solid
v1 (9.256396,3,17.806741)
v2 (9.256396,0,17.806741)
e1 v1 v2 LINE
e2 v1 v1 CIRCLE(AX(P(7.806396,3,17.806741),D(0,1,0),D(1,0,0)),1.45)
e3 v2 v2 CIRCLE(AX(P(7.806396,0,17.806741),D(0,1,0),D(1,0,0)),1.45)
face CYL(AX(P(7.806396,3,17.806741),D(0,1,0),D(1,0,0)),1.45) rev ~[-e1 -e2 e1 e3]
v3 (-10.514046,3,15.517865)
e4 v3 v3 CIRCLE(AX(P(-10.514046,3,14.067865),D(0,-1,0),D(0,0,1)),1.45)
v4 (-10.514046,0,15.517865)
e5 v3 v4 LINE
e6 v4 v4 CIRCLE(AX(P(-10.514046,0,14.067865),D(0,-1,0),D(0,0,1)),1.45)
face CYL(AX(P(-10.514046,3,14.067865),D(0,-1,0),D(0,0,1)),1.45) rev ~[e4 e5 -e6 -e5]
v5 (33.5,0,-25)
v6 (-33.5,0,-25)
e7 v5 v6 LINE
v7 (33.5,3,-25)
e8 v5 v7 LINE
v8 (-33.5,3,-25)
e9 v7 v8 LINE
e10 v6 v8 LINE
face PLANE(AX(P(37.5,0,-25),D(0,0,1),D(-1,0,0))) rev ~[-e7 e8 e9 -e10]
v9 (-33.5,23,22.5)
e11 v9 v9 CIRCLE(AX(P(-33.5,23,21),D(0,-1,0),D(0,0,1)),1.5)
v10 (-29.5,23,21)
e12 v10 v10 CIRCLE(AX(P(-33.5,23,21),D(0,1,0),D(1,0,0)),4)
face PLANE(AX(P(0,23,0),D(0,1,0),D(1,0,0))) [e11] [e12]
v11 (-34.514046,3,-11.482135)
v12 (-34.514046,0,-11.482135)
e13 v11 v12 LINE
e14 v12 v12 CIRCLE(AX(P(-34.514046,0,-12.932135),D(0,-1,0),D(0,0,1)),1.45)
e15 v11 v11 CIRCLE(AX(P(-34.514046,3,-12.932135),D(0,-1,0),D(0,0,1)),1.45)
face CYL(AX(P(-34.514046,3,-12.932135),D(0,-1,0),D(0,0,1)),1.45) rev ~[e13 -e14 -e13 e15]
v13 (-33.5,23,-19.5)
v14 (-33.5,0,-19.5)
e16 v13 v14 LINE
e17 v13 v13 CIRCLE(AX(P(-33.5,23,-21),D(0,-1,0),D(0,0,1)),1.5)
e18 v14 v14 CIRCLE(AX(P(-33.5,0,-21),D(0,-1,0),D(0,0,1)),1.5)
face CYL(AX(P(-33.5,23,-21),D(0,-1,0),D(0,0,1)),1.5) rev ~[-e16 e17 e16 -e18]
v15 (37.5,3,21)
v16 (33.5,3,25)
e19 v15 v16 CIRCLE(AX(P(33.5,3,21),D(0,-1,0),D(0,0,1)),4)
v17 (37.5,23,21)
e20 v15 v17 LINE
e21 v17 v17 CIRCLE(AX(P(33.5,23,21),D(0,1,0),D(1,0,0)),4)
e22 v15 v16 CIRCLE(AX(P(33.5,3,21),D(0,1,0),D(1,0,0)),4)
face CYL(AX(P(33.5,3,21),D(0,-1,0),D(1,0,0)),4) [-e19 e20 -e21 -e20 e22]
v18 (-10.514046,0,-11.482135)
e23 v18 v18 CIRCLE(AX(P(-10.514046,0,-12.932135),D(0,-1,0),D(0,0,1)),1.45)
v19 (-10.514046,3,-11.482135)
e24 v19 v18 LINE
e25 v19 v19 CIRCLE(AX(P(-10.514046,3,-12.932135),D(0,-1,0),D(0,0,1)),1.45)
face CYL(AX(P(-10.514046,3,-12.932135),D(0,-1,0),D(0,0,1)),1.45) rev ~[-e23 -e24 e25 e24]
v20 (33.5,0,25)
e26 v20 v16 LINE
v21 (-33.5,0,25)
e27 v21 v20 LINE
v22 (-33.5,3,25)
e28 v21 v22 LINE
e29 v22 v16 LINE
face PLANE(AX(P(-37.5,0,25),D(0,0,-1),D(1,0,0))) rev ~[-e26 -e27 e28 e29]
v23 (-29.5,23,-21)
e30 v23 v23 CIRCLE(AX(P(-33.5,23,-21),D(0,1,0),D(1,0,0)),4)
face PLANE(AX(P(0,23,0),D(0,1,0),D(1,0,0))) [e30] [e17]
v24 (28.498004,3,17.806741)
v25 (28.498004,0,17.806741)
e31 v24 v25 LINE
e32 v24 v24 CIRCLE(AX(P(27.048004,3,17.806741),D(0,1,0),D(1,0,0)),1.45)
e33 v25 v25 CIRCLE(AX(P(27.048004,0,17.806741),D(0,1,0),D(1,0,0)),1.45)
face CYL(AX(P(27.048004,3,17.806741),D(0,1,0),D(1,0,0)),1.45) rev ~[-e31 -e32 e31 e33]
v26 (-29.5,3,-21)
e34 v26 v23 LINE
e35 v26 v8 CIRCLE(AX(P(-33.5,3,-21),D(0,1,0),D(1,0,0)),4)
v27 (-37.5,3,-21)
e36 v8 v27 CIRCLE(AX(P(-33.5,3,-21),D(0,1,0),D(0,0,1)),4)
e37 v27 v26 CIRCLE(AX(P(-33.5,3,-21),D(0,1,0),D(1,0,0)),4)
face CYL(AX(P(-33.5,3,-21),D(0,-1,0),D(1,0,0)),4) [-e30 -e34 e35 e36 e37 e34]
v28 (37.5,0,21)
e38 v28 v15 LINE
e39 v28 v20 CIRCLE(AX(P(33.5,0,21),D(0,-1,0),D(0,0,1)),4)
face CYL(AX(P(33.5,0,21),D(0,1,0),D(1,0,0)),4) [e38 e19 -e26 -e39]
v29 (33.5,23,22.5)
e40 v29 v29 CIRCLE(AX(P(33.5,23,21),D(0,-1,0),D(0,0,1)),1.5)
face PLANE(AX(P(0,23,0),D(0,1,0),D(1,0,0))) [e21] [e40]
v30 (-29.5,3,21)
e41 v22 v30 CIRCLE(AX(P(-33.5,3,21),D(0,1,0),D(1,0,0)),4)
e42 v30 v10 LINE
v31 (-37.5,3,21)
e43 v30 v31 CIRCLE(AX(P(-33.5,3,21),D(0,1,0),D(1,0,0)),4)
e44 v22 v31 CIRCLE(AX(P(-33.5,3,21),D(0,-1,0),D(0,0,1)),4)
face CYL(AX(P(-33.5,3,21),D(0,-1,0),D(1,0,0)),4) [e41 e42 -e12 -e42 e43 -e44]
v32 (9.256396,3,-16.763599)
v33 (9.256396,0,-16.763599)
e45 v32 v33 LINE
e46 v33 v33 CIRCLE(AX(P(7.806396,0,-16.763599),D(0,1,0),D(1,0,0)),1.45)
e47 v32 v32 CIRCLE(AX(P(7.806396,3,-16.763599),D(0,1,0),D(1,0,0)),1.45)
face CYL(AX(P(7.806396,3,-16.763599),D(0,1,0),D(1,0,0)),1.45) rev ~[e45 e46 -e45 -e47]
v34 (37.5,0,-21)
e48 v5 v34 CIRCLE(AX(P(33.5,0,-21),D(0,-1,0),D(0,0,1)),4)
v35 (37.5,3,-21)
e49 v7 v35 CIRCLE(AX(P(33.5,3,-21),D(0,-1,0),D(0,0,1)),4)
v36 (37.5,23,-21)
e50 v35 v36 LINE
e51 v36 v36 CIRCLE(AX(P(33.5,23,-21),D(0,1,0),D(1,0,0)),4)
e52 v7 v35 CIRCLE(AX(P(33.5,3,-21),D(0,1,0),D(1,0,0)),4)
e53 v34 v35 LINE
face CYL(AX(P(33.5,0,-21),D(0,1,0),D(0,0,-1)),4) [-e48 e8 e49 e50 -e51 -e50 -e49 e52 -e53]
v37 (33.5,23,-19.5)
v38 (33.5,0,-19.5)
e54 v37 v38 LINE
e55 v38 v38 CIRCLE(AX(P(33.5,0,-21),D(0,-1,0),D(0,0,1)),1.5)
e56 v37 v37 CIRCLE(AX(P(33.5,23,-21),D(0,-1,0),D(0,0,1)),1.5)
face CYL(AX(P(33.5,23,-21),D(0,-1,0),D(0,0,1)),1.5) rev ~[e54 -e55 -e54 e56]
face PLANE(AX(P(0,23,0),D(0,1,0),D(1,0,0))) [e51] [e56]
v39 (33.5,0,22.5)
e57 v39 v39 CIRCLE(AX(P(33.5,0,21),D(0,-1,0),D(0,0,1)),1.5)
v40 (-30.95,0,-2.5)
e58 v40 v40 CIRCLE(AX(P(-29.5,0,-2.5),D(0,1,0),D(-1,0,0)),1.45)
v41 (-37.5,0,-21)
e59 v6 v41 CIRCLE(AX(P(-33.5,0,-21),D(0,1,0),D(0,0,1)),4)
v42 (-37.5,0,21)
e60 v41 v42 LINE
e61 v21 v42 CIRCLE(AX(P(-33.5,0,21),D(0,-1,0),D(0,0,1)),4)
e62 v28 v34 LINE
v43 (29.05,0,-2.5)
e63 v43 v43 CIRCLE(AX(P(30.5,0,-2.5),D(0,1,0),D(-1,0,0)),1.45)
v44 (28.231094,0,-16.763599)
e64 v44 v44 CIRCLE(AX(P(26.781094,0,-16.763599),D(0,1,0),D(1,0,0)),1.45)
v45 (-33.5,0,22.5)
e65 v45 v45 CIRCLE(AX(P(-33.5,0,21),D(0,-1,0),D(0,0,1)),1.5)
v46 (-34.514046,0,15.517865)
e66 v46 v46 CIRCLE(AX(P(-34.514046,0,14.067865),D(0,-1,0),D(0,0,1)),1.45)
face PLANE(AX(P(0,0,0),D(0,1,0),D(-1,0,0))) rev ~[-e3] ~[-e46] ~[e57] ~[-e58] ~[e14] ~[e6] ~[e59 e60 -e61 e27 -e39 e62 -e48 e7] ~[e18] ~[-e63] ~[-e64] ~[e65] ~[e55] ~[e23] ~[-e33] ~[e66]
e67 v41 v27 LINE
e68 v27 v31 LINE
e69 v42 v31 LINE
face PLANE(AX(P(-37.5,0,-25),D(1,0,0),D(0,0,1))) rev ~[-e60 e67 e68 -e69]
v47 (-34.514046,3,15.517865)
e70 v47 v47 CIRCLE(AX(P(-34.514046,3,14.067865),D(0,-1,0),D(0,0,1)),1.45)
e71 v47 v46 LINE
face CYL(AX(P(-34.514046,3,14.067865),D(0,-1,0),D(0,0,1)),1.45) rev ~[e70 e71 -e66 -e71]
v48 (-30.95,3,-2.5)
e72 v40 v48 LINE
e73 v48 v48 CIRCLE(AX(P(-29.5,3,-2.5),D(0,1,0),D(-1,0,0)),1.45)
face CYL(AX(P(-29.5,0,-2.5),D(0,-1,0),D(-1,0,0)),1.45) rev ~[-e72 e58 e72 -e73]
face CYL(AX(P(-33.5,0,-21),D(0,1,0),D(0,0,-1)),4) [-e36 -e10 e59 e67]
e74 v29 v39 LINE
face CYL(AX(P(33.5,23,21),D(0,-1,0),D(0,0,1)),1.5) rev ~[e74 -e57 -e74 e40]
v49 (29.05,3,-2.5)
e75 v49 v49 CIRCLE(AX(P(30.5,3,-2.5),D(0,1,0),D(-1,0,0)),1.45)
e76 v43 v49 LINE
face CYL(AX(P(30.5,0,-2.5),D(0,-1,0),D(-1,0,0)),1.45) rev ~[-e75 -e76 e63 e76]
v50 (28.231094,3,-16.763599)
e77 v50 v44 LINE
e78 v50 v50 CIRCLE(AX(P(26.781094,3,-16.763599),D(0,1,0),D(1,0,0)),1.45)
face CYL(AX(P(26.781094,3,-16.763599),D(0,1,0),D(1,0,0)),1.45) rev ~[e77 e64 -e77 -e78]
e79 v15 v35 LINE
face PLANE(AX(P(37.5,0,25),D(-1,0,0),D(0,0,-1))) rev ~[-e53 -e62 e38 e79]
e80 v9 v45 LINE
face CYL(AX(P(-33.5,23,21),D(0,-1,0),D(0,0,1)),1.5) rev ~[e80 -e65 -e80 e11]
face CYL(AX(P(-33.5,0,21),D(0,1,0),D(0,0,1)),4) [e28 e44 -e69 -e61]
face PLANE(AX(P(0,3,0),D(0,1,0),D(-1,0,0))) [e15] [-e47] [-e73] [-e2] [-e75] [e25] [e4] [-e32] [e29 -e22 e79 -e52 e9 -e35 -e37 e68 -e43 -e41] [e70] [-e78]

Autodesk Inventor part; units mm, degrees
ref_plane "YZ Plane" through (0, 0, 0) normal (1, 0, 0) x (0, 1, 0)
ref_plane "XZ Plane" through (0, 0, 0) normal (0, 1, 0) x (-1, 0, 0)
ref_plane "XY Plane" through (0, 0, 0) normal (0, 0, 1) x (1, 0, 0)
sketch "Sketch1" plane through (0, 0, 0) normal (0, 1, 0) x (-1, 0, 0)
  line L0 (37.5, 25) -> (-37.5, 25)
  line L1 (-37.5, 25) -> (-37.5, -25)
  line L2 (-37.5, -25) -> (37.5, -25)
  line L3 (37.5, -25) -> (37.5, 25)
  line L4 (37.5, 25) -> (-37.5, -25) construction
  line L5 (-37.5, 25) -> (37.5, -25) construction
  circle A0 centre (29.5, -0.5) radius 2 construction
  circle A1 centre (-30.5, -0.5) radius 2 construction
  circle A2 centre (29.5, -2.5) radius 1.45
  circle A3 centre (-30.5, -2.5) radius 1.45
  point P0 (0, 0)
  dimension "d0" = 75
  dimension "d1" = 50
  dimension "d9" = 2.9
  dimension "d10" = 2.9
sketch "Sketch1 outline for Extrusion1" plane through (0, 0, 0) normal (0, 1, 0) x (-1, 0, 0)
  line L0 (37.5, -25) -> (37.5, 25)
  line L1 (-37.5, -25) -> (37.5, -25)
  line L2 (37.5, 25) -> (-37.5, 25)
  line L3 (-37.5, 25) -> (-37.5, -25)
  circle A0 centre (29.5, -2.5) radius 1.45
  circle A1 centre (-30.5, -2.5) radius 1.45
extrude "Extrusion1" add sketch "Sketch1 outline for Extrusion1" along normal blind 3
fillet "Fillet1" radius 4 4 edges at (-37.5, 1.5, 25) (37.5, 1.5, 25) (37.5, 1.5, -25) (-37.5, 1.5, -25)
sketch "Sketch2" plane through (0, 3, 0) normal (0, 1, 0) x (1, 0, 0)
  arc A0 (-33.5, 25) -> (-37.5, 21) centre (-33.5, 21) ccw projected
  line L0 (-37.5, 21) -> (-37.5, -21) projected
  arc A1 (-37.5, -21) -> (-33.5, -25) centre (-33.5, -21) ccw projected
  line L1 (-33.5, -25) -> (33.5, -25) projected
  arc A2 (33.5, -25) -> (37.5, -21) centre (33.5, -21) ccw projected
  line L2 (37.5, -21) -> (37.5, 21) projected
  arc A3 (37.5, 21) -> (33.5, 25) centre (33.5, 21) ccw projected
  line L3 (33.5, 25) -> (-33.5, 25) projected
  circle A4 centre (-33.5, -21) radius 4
  circle A5 centre (-33.5, 21) radius 4
  circle A6 centre (33.5, 21) radius 4
  circle A7 centre (33.5, -21) radius 4
  point P0 (0, 0)
sketch "Sketch2 outline for Extrusion2" plane through (0, 3, 0) normal (0, 1, 0) x (1, 0, 0)
  circle A0 centre (-33.5, -21) radius 4
  circle A1 centre (-33.5, 21) radius 4
  circle A2 centre (33.5, 21) radius 4
  circle A3 centre (33.5, -21) radius 4
extrude "Extrusion2" add sketch "Sketch2 outline for Extrusion2" along normal blind 20
sketch "Sketch3" plane through (-33.5, 23, -21) normal (0, 1, 0) x (1, 0, 0)
  circle A0 centre (0, 0) radius 4 projected
  circle A1 centre (67, 0) radius 4 projected
  circle A2 centre (67, -42) radius 4 projected
  circle A3 centre (0, -42) radius 4 projected
  point P0 (33.5, -21)
hole "Hole1" at (33.5, 23, -21) at (33.5, 23, 21) at (-33.5, 23, 21) at (-33.5, 23, -21) direction (0, -1, 0) diameter 3 end through all
sketch "Sketch4" plane through (0, 3, 0) normal (0, 1, 0) x (1, 0, 0)
  circle A0 centre (-34.514046, 12.932135) radius 1
  circle A1 centre (-10.514046, -14.067865) radius 1
  circle A2 centre (-34.514046, -14.067865) radius 1
  circle A3 centre (-34.514046, 12.932135) radius 1
  circle A4 centre (-10.514046, 12.932135) radius 1
  line L0 (-9.014046, -15.567865) -> (-9.014046, 14.432135)
  line L1 (-9.014046, 14.432135) -> (-36.014046, 14.432135)
  line L2 (-36.014046, 14.432135) -> (-36.014046, -15.567865)
  line L3 (-36.014046, -15.567865) -> (-9.014046, -15.567865)
  point P0 (0, 0)
hole "Hole2" at (-10.514046, 3, -12.932135) at (-10.514046, 3, 14.067865) at (-34.514046, 3, 14.067865) at (-34.514046, 3, -12.932135) direction (0, -1, 0) diameter 2.9 end through all
sketch "Sketch5" plane through (0, 3, 0) normal (0, 1, 0) x (1, 0, 0)
  circle A0 centre (29.048004, -12.336543) radius 0.5
  circle A1 centre (27.048004, -12.336543) radius 0.5
  circle A2 centre (25.048004, -12.336543) radius 0.5
  circle A3 centre (23.048004, -12.336543) radius 0.5
  circle A4 centre (21.048004, -12.336543) radius 0.5
  circle A5 centre (19.048004, -12.336543) radius 0.5
  circle A6 centre (17.048004, -12.336543) radius 0.5
  circle A7 centre (15.048004, -12.336543) radius 0.5
  circle A8 centre (13.048004, -12.336543) radius 0.5
  circle A9 centre (11.048004, -12.336543) radius 0.5
  circle A10 centre (29.048004, -14.336543) radius 0.5
  circle A11 centre (27.048004, -14.336543) radius 0.5
  circle A12 centre (25.048004, -14.336543) radius 0.5
  circle A13 centre (23.048004, -14.336543) radius 0.5
  circle A14 centre (21.048004, -14.336543) radius 0.5
  circle A15 centre (19.048004, -14.336543) radius 0.5
  circle A16 centre (17.048004, -14.336543) radius 0.5
  circle A17 centre (15.048004, -14.336543) radius 0.5
  circle A18 centre (13.048004, -14.336543) radius 0.5
  circle A19 centre (11.048004, -14.336543) radius 0.5
  line L0 (36.448004, 3.863457) -> (40.048004, 3.863457)
  line L1 (40.048004, 3.863457) -> (40.048004, 4.163457)
  line L2 (40.048004, 4.163457) -> (42.048004, 4.163457)
  line L3 (42.048004, 4.163457) -> (42.048004, 15.163457)
  line L4 (42.048004, 15.163457) -> (5.048004, 15.163457)
  line L5 (5.048004, 15.163457) -> (3.048004, 13.163457)
  line L6 (3.048004, 13.163457) -> (3.048004, -14.036543)
  line L7 (3.048004, -14.036543) -> (5.048004, -16.036543)
  line L8 (5.048004, -16.036543) -> (35.748004, -16.036543)
  line L9 (35.748004, -16.036543) -> (35.748004, -13.436543)
  line L10 (35.748004, -13.436543) -> (36.448004, -13.436543)
  line L11 (36.448004, -13.436543) -> (36.448004, -11.381199)
  line L12 (36.448004, -11.381199) -> (41.474904, -11.381199)
  line L13 (41.474904, -11.381199) -> (41.474904, -13.436543)
  line L14 (41.474904, -13.436543) -> (42.048004, -13.436543)
  line L15 (42.048004, -13.436543) -> (42.048004, -5.136543)
  line L16 (42.048004, -5.136543) -> (40.048004, -5.136543)
  line L17 (40.048004, -5.136543) -> (40.048004, -4.336543)
  line L18 (40.048004, -4.336543) -> (36.448004, -4.336543)
  line L19 (36.448004, -4.336543) -> (36.448004, 3.863457)
  line L20 (10.248004, -8.436543) -> (10.248004, 7.063457)
  line L21 (10.248004, 7.063457) -> (27.748004, 7.063457)
  line L22 (27.748004, 7.063457) -> (27.748004, -8.436543)
  line L23 (27.748004, -8.436543) -> (10.248004, -8.436543)
  circle A20 centre (27.048004, -17.806741) radius 1.45
  circle A21 centre (7.806396, -17.806741) radius 1.45
  circle A22 centre (7.806396, 16.763599) radius 1.45
  circle A23 centre (26.781094, 16.763599) radius 1.45
  point P0 (0, 0)
  dimension "d25" = 2.9
  dimension "d26" = 2.9
  dimension "d27" = 2.9
  dimension "d28" = 2.9
sketch "Sketch5 outline for Extrusion3" plane through (0, 3, 0) normal (0, 1, 0) x (1, 0, 0)
  circle A0 centre (27.048004, -17.806741) radius 1.45
  circle A1 centre (7.806396, -17.806741) radius 1.45
  circle A2 centre (7.806396, 16.763599) radius 1.45
  circle A3 centre (26.781094, 16.763599) radius 1.45
extrude "Extrusion3" cut sketch "Sketch5 outline for Extrusion3" against normal blind 15
properties part number "cellSTORM_v5_miniElectronics"
